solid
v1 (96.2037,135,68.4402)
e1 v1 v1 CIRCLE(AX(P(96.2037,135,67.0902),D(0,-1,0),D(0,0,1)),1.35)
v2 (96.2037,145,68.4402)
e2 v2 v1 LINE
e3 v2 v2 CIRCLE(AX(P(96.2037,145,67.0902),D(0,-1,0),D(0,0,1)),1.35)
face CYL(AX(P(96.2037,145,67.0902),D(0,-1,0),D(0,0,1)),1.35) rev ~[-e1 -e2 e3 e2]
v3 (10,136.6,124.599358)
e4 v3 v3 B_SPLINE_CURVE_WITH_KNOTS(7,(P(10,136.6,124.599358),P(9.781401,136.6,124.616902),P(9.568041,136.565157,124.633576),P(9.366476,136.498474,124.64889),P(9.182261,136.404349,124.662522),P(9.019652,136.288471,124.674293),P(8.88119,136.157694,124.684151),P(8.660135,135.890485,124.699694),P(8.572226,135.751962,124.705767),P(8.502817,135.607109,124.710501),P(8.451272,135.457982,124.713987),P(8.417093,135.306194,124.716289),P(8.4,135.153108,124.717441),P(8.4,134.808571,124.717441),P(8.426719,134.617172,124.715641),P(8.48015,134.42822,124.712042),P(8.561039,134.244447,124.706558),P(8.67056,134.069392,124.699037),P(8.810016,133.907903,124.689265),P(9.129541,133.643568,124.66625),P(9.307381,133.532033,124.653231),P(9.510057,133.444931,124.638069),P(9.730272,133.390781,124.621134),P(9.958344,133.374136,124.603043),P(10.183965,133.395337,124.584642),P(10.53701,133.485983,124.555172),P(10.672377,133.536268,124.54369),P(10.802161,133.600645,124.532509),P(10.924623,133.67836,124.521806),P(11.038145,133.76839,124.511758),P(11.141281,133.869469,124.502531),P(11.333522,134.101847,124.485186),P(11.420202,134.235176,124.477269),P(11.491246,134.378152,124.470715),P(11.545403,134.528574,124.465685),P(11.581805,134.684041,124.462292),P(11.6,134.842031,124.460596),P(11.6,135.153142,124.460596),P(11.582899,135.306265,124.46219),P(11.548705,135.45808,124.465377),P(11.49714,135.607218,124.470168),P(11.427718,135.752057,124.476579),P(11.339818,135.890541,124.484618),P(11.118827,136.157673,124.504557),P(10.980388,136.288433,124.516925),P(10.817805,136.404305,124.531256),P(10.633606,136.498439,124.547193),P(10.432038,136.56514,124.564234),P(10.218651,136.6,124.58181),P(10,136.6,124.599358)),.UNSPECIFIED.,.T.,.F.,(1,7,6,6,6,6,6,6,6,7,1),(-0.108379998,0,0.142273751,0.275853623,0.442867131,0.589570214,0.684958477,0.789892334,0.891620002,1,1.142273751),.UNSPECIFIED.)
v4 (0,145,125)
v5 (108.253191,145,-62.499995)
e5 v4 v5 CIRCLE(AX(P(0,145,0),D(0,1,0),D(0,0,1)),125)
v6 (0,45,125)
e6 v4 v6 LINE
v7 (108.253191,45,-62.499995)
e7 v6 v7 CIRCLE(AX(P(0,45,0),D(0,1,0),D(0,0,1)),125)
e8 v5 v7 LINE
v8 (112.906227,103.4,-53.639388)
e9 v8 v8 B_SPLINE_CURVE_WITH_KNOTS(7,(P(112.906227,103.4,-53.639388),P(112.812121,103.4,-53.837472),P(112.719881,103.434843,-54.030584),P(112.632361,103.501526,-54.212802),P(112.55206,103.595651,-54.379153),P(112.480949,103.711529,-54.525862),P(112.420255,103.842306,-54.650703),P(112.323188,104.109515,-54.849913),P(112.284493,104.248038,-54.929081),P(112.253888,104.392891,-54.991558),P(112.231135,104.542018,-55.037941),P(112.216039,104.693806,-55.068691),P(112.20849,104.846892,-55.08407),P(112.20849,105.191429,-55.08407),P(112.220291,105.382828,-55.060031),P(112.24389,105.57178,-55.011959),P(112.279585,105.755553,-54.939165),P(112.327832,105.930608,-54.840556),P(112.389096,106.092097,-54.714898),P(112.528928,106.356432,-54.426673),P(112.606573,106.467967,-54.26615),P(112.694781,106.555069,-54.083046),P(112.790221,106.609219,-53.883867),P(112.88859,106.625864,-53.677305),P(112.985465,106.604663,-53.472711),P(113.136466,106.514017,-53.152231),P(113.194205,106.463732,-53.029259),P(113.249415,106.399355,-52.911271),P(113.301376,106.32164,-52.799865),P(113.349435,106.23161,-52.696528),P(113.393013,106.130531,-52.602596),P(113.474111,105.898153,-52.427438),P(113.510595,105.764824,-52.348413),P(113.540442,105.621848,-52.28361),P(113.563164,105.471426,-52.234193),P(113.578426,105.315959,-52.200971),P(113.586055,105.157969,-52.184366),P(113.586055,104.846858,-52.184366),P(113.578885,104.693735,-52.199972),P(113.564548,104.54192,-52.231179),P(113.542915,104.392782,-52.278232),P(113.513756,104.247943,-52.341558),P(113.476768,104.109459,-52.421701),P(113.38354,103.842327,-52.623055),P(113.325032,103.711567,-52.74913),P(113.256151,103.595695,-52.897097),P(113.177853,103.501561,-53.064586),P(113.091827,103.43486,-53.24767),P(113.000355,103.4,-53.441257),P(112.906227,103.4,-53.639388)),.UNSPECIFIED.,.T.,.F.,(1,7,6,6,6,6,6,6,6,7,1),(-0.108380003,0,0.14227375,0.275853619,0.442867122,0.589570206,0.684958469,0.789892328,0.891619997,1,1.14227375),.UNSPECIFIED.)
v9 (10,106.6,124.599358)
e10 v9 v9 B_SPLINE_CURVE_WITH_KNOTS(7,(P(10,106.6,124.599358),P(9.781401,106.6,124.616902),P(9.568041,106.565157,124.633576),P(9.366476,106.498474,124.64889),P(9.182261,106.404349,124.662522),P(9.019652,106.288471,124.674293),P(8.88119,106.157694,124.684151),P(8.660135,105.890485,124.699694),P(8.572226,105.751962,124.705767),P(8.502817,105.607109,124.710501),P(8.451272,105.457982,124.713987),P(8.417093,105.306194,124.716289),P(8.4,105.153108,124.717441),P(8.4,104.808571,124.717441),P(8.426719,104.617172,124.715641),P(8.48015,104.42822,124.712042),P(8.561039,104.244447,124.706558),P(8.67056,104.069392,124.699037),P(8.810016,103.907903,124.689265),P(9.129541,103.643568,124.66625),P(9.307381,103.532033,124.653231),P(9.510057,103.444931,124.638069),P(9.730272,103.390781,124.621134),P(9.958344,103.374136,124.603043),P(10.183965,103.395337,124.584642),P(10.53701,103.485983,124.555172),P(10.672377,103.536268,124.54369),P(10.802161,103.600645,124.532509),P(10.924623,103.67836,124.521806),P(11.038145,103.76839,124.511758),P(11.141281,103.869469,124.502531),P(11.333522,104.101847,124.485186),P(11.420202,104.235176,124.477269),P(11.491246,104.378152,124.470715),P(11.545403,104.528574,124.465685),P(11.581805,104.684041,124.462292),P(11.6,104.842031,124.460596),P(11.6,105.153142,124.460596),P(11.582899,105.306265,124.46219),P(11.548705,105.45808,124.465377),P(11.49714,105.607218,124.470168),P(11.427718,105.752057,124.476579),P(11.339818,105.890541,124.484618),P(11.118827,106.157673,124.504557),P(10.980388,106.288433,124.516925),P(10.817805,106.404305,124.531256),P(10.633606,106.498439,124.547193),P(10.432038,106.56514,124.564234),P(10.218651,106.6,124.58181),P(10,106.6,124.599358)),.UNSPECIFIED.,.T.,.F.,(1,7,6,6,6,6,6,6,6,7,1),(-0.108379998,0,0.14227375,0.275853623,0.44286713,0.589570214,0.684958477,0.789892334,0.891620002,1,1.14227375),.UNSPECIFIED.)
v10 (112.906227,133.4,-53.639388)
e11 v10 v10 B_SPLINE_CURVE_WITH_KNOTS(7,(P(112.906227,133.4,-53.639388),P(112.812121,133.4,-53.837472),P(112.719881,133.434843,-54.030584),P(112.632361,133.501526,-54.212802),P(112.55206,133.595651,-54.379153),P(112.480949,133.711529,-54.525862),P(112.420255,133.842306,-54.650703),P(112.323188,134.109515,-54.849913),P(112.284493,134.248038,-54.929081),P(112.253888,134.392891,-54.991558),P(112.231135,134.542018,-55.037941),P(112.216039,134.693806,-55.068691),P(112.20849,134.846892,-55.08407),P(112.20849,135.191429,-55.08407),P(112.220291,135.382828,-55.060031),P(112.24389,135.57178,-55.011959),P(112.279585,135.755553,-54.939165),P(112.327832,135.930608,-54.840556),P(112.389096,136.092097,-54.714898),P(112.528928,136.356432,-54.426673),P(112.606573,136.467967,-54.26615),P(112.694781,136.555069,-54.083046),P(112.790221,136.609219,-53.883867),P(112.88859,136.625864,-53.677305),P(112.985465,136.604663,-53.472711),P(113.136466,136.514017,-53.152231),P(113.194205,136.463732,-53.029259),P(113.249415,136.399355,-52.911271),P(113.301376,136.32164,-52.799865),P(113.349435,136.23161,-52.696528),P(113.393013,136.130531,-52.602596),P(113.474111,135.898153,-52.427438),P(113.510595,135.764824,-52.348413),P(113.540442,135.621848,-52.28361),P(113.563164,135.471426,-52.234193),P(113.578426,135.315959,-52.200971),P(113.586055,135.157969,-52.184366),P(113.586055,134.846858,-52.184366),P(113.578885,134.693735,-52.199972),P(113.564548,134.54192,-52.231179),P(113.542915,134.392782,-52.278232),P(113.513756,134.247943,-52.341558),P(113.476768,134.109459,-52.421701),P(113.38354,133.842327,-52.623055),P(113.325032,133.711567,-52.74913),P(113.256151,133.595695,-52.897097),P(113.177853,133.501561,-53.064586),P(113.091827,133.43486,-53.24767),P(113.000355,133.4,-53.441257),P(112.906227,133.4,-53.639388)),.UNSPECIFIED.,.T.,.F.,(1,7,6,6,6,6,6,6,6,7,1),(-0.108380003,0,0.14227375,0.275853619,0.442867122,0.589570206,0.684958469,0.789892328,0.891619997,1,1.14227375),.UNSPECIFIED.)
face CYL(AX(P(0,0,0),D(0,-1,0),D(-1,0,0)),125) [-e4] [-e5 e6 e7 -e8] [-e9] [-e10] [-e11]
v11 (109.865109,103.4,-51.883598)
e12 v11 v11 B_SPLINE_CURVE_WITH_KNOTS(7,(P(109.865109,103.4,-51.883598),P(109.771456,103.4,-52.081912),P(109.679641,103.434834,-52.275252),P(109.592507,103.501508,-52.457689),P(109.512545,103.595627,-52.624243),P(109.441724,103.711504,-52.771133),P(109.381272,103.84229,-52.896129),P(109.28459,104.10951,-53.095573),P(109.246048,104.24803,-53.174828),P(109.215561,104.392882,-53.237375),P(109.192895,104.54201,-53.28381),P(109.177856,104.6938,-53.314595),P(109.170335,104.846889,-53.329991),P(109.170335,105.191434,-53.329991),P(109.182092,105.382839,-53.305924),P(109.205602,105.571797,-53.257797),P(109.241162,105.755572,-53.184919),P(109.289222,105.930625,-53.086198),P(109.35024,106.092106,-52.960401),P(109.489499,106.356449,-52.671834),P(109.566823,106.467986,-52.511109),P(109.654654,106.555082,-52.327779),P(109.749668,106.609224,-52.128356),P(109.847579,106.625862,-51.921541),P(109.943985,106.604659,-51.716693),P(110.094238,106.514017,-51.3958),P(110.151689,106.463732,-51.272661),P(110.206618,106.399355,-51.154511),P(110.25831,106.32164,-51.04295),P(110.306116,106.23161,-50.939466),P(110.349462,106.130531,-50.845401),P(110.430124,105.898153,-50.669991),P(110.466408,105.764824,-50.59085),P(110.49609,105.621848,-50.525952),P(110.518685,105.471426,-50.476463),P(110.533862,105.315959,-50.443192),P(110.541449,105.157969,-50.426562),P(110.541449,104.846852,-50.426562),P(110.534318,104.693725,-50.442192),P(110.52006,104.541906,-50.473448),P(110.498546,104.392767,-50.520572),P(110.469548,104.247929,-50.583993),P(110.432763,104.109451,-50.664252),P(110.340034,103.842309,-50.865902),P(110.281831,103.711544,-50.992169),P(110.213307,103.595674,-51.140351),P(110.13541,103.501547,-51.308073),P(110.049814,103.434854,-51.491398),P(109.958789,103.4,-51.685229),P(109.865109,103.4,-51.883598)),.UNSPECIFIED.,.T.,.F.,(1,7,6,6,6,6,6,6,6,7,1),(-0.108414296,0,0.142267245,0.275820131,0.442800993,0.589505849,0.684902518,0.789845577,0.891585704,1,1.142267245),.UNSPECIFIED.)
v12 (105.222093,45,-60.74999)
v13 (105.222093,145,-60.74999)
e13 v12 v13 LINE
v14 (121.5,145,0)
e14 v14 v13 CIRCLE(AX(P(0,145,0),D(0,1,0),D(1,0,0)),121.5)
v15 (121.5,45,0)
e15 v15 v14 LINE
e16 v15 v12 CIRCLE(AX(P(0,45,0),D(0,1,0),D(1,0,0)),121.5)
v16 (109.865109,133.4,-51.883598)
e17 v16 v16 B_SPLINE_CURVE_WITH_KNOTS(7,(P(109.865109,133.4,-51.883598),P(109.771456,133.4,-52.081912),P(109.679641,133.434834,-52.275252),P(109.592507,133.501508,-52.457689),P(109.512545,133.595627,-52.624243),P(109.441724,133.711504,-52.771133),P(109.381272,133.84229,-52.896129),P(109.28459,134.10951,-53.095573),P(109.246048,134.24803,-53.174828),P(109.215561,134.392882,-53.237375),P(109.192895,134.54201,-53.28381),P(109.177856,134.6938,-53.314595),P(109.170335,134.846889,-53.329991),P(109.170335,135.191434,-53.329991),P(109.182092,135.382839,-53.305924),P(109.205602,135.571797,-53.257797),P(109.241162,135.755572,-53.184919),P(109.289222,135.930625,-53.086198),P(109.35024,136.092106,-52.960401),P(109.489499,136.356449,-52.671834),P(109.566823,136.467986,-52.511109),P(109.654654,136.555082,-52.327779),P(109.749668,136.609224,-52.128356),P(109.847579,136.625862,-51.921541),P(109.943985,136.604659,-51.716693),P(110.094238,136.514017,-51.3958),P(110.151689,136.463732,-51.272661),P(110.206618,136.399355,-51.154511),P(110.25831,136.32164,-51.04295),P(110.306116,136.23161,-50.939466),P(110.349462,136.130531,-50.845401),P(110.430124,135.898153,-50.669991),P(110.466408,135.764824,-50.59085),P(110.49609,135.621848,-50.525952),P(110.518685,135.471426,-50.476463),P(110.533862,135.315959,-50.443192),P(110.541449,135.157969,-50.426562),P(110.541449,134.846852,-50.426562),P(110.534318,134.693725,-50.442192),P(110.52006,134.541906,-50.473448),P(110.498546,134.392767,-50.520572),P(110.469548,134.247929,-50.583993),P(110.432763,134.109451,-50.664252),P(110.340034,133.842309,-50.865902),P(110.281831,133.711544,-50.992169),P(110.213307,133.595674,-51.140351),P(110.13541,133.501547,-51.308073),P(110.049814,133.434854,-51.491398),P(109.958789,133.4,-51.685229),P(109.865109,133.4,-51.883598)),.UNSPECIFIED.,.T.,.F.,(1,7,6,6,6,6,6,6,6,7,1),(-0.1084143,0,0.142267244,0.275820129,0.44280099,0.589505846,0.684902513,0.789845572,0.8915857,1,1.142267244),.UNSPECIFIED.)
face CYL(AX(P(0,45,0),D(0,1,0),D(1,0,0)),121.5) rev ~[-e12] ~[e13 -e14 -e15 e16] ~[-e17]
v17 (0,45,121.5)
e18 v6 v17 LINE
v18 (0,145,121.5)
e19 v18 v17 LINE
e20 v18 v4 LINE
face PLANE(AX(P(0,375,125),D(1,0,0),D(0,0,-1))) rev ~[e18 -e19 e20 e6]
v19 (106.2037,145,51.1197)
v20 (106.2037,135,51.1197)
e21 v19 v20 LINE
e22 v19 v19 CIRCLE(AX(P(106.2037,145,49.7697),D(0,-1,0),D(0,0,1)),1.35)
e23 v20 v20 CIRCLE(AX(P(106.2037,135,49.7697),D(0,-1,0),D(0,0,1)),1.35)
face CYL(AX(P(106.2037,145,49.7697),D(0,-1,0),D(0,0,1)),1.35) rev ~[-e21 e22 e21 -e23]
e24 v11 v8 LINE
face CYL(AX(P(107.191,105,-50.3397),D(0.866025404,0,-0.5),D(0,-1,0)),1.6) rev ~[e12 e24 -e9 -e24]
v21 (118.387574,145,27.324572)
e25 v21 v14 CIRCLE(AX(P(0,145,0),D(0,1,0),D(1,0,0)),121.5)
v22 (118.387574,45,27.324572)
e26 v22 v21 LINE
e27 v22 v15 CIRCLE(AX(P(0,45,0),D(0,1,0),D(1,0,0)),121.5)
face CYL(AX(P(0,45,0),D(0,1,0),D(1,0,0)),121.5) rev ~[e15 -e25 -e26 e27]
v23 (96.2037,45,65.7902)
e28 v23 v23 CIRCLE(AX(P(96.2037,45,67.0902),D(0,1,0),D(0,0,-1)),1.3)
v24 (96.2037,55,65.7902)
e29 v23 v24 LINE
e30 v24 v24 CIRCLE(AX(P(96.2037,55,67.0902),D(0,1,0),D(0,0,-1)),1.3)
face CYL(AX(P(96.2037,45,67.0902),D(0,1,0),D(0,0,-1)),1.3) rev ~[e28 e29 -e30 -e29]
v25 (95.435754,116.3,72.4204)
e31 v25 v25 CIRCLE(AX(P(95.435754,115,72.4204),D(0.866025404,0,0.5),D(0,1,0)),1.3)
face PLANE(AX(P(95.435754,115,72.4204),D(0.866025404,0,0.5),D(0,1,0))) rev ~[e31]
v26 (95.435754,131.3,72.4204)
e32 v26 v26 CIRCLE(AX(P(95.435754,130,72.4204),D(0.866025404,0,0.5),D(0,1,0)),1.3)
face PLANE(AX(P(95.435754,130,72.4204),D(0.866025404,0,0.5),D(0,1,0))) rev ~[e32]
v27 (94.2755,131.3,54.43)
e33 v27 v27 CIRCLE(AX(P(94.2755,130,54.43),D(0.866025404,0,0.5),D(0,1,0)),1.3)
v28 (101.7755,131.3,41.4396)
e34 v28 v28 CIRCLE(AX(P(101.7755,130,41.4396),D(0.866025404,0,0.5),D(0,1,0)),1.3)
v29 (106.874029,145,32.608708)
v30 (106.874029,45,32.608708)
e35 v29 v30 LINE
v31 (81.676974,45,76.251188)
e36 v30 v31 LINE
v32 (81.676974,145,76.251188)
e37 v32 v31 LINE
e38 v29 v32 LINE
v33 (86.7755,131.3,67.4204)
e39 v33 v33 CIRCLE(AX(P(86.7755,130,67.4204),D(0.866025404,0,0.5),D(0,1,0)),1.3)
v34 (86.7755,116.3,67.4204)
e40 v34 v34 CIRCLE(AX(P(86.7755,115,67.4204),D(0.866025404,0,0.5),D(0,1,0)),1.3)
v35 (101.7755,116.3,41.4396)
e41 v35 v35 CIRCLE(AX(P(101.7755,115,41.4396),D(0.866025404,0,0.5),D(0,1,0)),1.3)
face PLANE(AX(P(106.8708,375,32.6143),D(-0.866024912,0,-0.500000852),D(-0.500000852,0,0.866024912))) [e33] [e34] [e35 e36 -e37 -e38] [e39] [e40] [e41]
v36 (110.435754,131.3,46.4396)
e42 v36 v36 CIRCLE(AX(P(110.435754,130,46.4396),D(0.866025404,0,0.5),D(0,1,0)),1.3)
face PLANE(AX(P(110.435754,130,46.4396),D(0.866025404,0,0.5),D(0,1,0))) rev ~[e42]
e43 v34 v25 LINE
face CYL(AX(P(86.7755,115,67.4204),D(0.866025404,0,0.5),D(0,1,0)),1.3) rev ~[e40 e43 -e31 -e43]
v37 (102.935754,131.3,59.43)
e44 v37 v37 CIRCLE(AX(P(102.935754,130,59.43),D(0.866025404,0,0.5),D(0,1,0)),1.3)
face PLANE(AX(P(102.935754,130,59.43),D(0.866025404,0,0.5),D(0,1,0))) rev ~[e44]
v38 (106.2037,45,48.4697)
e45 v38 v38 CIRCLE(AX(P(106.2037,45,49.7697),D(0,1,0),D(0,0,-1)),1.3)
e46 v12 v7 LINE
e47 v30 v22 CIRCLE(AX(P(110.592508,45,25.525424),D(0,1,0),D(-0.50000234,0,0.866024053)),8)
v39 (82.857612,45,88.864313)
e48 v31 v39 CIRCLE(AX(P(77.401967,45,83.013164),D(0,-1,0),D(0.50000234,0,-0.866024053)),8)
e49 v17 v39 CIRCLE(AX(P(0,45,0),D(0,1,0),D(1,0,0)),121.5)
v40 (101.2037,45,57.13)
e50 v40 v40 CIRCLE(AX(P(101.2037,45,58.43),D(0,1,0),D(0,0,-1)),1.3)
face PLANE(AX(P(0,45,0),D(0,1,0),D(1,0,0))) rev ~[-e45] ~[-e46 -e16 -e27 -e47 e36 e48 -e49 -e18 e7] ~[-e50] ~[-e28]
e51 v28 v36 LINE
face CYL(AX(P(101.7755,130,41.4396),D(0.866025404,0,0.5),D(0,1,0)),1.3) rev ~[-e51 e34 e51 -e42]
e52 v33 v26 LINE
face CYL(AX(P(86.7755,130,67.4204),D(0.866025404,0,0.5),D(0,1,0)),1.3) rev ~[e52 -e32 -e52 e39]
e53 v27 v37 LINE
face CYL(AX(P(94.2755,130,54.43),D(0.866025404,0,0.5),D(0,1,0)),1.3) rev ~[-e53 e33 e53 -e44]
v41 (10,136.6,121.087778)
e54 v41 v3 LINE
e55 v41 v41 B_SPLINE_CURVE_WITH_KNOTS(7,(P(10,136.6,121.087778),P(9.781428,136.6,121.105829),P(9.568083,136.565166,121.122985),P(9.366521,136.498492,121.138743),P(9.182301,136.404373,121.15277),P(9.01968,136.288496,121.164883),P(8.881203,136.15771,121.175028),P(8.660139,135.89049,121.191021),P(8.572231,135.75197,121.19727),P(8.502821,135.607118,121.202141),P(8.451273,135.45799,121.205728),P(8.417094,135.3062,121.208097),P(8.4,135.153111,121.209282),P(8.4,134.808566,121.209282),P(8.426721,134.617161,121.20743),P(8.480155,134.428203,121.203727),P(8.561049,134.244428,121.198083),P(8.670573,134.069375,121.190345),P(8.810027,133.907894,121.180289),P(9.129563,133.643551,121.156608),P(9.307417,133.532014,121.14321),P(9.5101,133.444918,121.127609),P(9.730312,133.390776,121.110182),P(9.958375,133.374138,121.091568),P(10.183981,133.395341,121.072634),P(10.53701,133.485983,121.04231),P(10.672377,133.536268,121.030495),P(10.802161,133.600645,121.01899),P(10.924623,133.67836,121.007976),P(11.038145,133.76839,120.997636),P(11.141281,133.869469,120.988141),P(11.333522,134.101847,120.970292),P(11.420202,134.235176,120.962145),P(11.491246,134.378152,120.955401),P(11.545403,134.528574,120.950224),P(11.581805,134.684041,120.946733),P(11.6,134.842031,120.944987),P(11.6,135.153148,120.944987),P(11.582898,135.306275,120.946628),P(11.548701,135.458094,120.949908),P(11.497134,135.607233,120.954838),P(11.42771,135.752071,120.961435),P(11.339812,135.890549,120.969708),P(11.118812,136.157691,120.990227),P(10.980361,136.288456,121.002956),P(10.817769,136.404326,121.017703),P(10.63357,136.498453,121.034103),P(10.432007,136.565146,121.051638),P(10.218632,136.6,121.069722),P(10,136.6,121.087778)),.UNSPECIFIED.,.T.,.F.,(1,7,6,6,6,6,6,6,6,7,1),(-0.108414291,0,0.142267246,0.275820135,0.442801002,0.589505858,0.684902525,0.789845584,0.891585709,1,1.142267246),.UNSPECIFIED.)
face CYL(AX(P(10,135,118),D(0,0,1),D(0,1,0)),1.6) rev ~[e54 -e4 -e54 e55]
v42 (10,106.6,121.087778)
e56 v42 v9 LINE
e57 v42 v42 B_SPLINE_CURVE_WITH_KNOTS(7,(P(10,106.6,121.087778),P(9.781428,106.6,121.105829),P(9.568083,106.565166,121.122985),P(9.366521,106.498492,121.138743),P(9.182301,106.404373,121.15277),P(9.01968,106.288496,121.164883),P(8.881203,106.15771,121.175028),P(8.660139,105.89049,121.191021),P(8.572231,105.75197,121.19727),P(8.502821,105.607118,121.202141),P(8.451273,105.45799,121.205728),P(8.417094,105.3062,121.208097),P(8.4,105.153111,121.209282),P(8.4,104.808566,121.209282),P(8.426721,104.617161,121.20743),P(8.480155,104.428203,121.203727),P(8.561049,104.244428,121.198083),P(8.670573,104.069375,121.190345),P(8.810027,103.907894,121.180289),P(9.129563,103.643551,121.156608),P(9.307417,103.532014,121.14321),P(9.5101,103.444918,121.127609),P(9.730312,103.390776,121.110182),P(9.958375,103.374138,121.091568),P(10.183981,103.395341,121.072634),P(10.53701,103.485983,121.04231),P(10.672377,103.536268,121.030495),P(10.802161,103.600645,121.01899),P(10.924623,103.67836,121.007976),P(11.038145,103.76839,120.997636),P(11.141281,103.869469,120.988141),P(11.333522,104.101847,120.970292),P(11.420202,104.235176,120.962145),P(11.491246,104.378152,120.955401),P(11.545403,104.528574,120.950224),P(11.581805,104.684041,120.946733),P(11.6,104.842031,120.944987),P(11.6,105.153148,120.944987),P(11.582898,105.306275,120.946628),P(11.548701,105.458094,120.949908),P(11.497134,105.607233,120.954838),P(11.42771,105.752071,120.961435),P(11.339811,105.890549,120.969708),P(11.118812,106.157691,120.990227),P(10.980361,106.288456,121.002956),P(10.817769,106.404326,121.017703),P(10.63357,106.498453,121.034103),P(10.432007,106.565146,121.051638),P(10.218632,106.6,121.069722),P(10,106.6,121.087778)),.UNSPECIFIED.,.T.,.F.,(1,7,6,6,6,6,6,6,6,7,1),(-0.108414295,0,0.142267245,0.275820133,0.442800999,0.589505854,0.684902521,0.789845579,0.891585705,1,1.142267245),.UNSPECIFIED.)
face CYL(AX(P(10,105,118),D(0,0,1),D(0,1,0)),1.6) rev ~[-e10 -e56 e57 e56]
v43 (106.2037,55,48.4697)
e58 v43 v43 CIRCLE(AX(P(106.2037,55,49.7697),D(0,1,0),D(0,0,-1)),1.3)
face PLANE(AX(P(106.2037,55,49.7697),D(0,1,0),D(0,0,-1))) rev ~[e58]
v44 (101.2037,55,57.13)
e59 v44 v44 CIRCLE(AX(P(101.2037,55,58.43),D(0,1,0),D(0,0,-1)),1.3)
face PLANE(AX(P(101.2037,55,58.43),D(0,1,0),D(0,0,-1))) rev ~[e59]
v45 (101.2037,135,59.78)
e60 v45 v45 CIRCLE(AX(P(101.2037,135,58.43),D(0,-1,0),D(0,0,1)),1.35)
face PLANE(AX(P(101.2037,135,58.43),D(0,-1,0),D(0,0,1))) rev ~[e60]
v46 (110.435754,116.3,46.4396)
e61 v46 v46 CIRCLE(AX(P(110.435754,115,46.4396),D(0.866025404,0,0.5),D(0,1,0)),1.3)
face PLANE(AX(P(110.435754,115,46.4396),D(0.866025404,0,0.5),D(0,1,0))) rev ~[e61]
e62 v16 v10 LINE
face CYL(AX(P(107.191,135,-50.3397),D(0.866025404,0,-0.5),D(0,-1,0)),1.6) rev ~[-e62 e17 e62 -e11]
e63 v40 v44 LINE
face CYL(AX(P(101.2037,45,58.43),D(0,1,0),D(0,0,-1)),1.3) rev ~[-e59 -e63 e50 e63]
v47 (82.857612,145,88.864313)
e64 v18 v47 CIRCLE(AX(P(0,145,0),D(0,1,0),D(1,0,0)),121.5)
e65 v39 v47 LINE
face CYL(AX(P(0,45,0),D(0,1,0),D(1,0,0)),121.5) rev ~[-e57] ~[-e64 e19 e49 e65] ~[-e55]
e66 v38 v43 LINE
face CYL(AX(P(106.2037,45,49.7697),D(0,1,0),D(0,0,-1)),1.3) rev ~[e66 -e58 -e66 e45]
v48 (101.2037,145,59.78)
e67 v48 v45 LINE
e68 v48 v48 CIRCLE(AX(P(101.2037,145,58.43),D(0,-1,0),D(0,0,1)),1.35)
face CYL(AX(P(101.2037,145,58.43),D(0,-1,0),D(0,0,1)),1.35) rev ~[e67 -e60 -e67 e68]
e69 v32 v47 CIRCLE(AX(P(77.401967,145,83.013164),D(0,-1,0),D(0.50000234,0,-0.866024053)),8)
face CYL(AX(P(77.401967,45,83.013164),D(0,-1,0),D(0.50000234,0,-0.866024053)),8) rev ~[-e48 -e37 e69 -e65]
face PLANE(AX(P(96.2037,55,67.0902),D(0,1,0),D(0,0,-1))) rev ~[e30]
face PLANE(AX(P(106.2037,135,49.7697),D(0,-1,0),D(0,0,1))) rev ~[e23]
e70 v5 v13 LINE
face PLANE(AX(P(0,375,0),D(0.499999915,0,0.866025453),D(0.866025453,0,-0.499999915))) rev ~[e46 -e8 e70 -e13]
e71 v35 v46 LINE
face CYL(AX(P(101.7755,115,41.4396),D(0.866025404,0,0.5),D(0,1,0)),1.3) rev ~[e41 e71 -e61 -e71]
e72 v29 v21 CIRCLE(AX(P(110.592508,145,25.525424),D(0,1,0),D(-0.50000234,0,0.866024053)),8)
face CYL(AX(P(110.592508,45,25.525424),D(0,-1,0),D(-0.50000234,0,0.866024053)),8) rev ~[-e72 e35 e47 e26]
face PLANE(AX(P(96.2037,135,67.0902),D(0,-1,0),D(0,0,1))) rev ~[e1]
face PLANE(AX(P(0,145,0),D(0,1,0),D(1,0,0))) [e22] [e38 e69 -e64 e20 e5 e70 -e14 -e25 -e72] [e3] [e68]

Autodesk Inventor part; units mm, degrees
ref_plane "YZ Plane" through (0, 0, 0) normal (1, 0, 0) x (0, 1, 0)
ref_plane "XZ Plane" through (0, 0, 0) normal (0, 1, 0) x (-1, 0, 0)
ref_plane "XY Plane" through (0, 0, 0) normal (0, 0, 1) x (1, 0, 0)
sketch "スケッチ1" plane through (0, 0, 0) normal (0, 1, 0) x (-1, 0, 0)
  circle A0 centre (0, 0) radius 125
  dimension "d0" = 250
extrude "押し出し1" add sketch "スケッチ1" along normal blind 375
sketch "スケッチ2" plane through (0, 0, 0) normal (0, -1, 0) x (1, 0, 0)
  circle A0 centre (0, 0) radius 125
extrude "押し出し2" cut sketch "スケッチ2" against normal blind 40
sketch "スケッチ3" plane through (0, 40, 0) normal (0, -1, 0) x (1, 0, 0)
  circle A0 centre (0, 0) radius 125 projected
  point P0 (0, 100)
  point P1 (-86.6025, -50)
  point P2 (86.6025, -50)
  dimension "d5" = 100
  dimension "d8" = 360
hole "穴1" at (0, 40, 100) at (-86.6025, 40, -50) at (86.6025, 40, -50) direction (0, 1, 0) diameter 3.2 depth 8
sketch "スケッチ4" plane through (0, 40, 0) normal (0, -1, 0) x (1, 0, 0)
  circle A0 centre (0, 100) radius 1.6 projected
  point P0 (0, 0)
  point P1 (0, 110)
  point P2 (-95.2628, -55)
  point P3 (95.2628, -55)
  dimension "d17" = 10
  dimension "d20" = 360
hole "穴2" at (0, 40, 110) at (-95.2628, 40, -55) at (95.2628, 40, -55) direction (0, 1, 0) diameter 3.2 depth 8
sketch "スケッチ5" plane through (0, 375, 0) normal (0, 1, 0) x (1, 0, 0)
  circle A0 centre (0, 0) radius 120
  dimension "d29" = 240
extrude "押し出し3" cut sketch "スケッチ5" against normal blind 330
sketch "スケッチ6" plane through (0, 45, 0) normal (0, 1, 0) x (1, 0, 0)
  circle A0 centre (0, 0) radius 120 projected
  line L0 (0, -118) -> (-21.8174, -118)
  line L1 (0, -118) -> (21.8174, -118)
  arc A1 (21.8174, -118) -> (-21.8174, -118) centre (0, 0) ccw
  arc A2 (-21.8174, -118) -> (21.8174, -118) centre (0, 0) ccw
  arc A3 (113.0997, 40.1056) -> (91.2823, 77.8944) centre (0, 0) ccw
  line L2 (102.191, 59) -> (91.2823, 77.8944)
  line L3 (102.191, 59) -> (113.0997, 40.1056)
  arc A4 (-91.2823, 77.8944) -> (-113.0997, 40.1056) centre (0, 0) ccw
  line L4 (-102.191, 59) -> (-113.0997, 40.1056)
  line L5 (-102.191, 59) -> (-91.2823, 77.8944)
  point P0 (-91.2823, 77.8944)
  point P1 (-113.0997, 40.1056)
  point P2 (113.0997, 40.1056)
  point P3 (91.2823, 77.8944)
  dimension "d32" = 118
  dimension "d35" = 360
extrude "押し出し4" add sketch "スケッチ6" along normal blind 330 contours L3 L2 A0 | A0 L0 L1 | L5 L4 A0
sketch "スケッチ8" plane through (21.8174, 45, 118) normal (0, 0, -1) x (-1, 0, 0)
  line L0 (43.6348, 0) -> (0, 0) projected
  point P0 (21.8174, -45)
  point P1 (11.8174, 60)
  point P2 (31.8174, 60)
  point P3 (11.8174, 90)
  point P4 (31.8174, 90)
  dimension "d52" = 30
  dimension "d90" = 60
  dimension "d91" = 60
  dimension "d92" = 30
hole "穴4" at (10, 105, 118) at (-10, 105, 118) at (10, 135, 118) at (-10, 135, 118) direction (0, 0, 1) diameter 3.2 depth 8
sketch "スケッチ11" plane through (113.0997, 45, -40.1056) normal (-0.8660254, 0, 0.5) x (0.5, 0, 0.8660254)
  line L0 (0, 0) -> (-43.6348, 0) projected
  point P0 (-21.8174, -45)
  point P1 (-31.8174, 60)
  point P2 (-31.8174, 90)
  point P3 (-11.8174, 60)
  point P4 (-11.8174, 90)
  dimension "d65" = 30
  dimension "d95" = 60
  dimension "d96" = 60
  dimension "d98" = 30
hole "穴5" at (97.191, 105, -67.6603) at (97.191, 135, -67.6603) at (107.191, 135, -50.3397) at (107.191, 105, -50.3397) direction (0.8660254, 0, -0.5) diameter 3.2 depth 8
sketch "スケッチ12" plane through (0, 375, 0) normal (0, 1, 0) x (1, 0, 0)
  circle A0 centre (0, 0) radius 121.5
  dimension "d73" = 243
extrude "押し出し6" cut sketch "スケッチ12" against normal blind 330
sketch "スケッチ13" plane through (0, 375, 0) normal (0, 1, 0) x (1, 0, 0)
  circle A0 centre (0, 0) radius 125 projected
  line L0 (0, -125) -> (0, 0)
  line L1 (0, 0) -> (108.2532, 62.5)
  arc A1 (0, -125) -> (108.2532, 62.5) centre (0, 0) ccw
  circle A2 centre (0, 0) radius 125
  dimension "d76" = 125
  dimension "d77" = 120
extrude "押し出し7" cut sketch "スケッチ13" against normal blind 400 contours L1 L0 A0 picked at (69.3351, 45.9431)
sketch "スケッチ14" plane through (0, 45, 0) normal (0, 1, 0) x (1, 0, 0)
  line L0 (0, 0) -> (85.2169, 49.2) projected
  line L1 (0, -111.6) -> (0, -121.5) projected
  circle A0 centre (0, 0) radius 121.5
extrude "押し出し8" cut sketch "スケッチ14" against normal blind 400
sketch "スケッチ15" plane through (0, 40, 0) normal (0, -1, 0) x (1, 0, 0)
  line L0 (0, 0) -> (105.2221, 60.75)
  arc A0 (105.2221, -60.75) -> (0, 121.5) centre (0, 0) ccw projected
  line L1 (0, 0) -> (121.5, 0) construction
  line L2 (102.9357, 59.43) -> (115.531, 37.6143)
  line L3 (102.9357, 59.43) -> (90.3404, 81.2456)
  dimension "d82" = 30
extrude "押し出し9" add sketch "スケッチ15" against normal blind 335
sketch "スケッチ17" plane through (0, 40, 0) normal (0, -1, 0) x (1, 0, 0)
  circle A0 centre (0, 0) radius 125
extrude "押し出し11" cut sketch "スケッチ17" against normal blind 5
sketch "スケッチ19" plane through (0, 375, 0) normal (0, 1, 0) x (1, 0, 0)
  arc A0 (115.531, -37.6143) -> (105.2221, 60.75) centre (0, 0) ccw projected
  line L0 (115.531, -37.6143) -> (90.3404, -81.2456) projected
  line L1 (115.531, -37.6143) -> (90.3404, -81.2456)
  line L2 (90.3404, -81.2456) -> (81.6802, -76.2456)
  line L3 (115.531, -37.6143) -> (106.8708, -32.6143)
  line L4 (106.8708, -32.6143) -> (81.6802, -76.2456)
  dimension "d104" = 10
extrude "押し出し13" add sketch "スケッチ19" against normal blind 330
sketch "スケッチ21" plane through (0, 375, 0) normal (0, 1, 0) x (1, 0, 0)
  circle A0 centre (0, 0) radius 125
extrude "押し出し15" cut sketch "スケッチ21" against normal blind 230
fillet "フィレット1" radius 8 2 edges at (115.531, 95, 37.6143) (90.3404, 95, 81.2456)
sketch "スケッチ22" plane through (106.8708, 45, 32.6143) normal (-0.8660254, 0, -0.5) x (-0.5, 0, 0.8660254)
  line L0 (50.3812, 100) -> (0, 100) projected
  line L1 (25.1906, 85) -> (25.1906, 80.9836)
  point P0 (25.1906, -45)
  point P1 (10.1906, 85)
  point P2 (10.1906, 70)
  point P3 (40.1906, 85)
  point P4 (40.1906, 70)
  dimension "d112" = 15
  dimension "d113" = 15
  dimension "d114" = 15
hole "穴6" at (94.2755, 130, 54.43) at (101.7755, 130, 41.4396) at (101.7755, 115, 41.4396) at (86.7755, 130, 67.4204) at (86.7755, 115, 67.4204) direction (0.8660254, 0, 0.5) diameter 2.6 depth 10
sketch "スケッチ23" plane through (0, 45, 0) normal (0, -1, 0) x (1, 0, 0)
  line L0 (81.6802, 76.2456) -> (106.8708, 32.6143) projected
  arc A0 (118.386, 27.3315) -> (106.8708, 32.6143) centre (110.591, 25.5319) ccw projected
  line L1 (106.8708, 32.6143) -> (94.2755, 54.4299)
  line L2 (102.2857, 60.5558) -> (93.6255, 55.5558) projected
  line L3 (94.2755, 54.43) -> (101.2037, 58.43)
  line L4 (103.5857, 58.3041) -> (94.9255, 53.3041) projected
  line L5 (94.2755, 54.43) -> (102.2755, 54.43) construction
  point P0 (0, 0)
  dimension "d124" = 25.1905
  dimension "d126" = 8
  dimension "d127" = 30
hole "穴7" at (101.2037, 45, 58.43) direction (0, 1, 0) diameter 2.6 depth 10
sketch "スケッチ24" plane through (0, 45, 0) normal (0, -1, 0) x (1, 0, 0)
  circle A0 centre (101.2037, 58.43) radius 1.3 projected
  line L0 (101.2037, 58.43) -> (96.2037, 67.0902)
  line L1 (94.7857, 73.5462) -> (86.1255, 68.5462) projected
  line L2 (101.2037, 58.43) -> (111.2037, 58.43) construction
  line L3 (96.2037, 67.0902) -> (106.2037, 49.7697)
  point P0 (0, 0)
  dimension "d135" = 10
  dimension "d136" = 120
  dimension "d137" = 20
hole "穴8" at (96.2037, 45, 67.0902) at (106.2037, 45, 49.7697) direction (0, 1, 0) diameter 2.6 depth 10
sketch "スケッチ27" plane through (0, 145, 0) normal (0, 1, 0) x (1, 0, 0)
  circle A0 centre (101.2037, -58.43) radius 1.3 projected
  circle A1 centre (96.2037, -67.0902) radius 1.3 projected
  circle A2 centre (106.2037, -49.7697) radius 1.3 projected
  point P0 (0, 0)
hole "穴10" at (101.2037, 145, 58.43) at (96.2037, 145, 67.0902) at (106.2037, 145, 49.7697) direction (0, -1, 0) diameter 2.7 depth 10
properties part number "newbody5" material "PC/ABS プラスチック"
